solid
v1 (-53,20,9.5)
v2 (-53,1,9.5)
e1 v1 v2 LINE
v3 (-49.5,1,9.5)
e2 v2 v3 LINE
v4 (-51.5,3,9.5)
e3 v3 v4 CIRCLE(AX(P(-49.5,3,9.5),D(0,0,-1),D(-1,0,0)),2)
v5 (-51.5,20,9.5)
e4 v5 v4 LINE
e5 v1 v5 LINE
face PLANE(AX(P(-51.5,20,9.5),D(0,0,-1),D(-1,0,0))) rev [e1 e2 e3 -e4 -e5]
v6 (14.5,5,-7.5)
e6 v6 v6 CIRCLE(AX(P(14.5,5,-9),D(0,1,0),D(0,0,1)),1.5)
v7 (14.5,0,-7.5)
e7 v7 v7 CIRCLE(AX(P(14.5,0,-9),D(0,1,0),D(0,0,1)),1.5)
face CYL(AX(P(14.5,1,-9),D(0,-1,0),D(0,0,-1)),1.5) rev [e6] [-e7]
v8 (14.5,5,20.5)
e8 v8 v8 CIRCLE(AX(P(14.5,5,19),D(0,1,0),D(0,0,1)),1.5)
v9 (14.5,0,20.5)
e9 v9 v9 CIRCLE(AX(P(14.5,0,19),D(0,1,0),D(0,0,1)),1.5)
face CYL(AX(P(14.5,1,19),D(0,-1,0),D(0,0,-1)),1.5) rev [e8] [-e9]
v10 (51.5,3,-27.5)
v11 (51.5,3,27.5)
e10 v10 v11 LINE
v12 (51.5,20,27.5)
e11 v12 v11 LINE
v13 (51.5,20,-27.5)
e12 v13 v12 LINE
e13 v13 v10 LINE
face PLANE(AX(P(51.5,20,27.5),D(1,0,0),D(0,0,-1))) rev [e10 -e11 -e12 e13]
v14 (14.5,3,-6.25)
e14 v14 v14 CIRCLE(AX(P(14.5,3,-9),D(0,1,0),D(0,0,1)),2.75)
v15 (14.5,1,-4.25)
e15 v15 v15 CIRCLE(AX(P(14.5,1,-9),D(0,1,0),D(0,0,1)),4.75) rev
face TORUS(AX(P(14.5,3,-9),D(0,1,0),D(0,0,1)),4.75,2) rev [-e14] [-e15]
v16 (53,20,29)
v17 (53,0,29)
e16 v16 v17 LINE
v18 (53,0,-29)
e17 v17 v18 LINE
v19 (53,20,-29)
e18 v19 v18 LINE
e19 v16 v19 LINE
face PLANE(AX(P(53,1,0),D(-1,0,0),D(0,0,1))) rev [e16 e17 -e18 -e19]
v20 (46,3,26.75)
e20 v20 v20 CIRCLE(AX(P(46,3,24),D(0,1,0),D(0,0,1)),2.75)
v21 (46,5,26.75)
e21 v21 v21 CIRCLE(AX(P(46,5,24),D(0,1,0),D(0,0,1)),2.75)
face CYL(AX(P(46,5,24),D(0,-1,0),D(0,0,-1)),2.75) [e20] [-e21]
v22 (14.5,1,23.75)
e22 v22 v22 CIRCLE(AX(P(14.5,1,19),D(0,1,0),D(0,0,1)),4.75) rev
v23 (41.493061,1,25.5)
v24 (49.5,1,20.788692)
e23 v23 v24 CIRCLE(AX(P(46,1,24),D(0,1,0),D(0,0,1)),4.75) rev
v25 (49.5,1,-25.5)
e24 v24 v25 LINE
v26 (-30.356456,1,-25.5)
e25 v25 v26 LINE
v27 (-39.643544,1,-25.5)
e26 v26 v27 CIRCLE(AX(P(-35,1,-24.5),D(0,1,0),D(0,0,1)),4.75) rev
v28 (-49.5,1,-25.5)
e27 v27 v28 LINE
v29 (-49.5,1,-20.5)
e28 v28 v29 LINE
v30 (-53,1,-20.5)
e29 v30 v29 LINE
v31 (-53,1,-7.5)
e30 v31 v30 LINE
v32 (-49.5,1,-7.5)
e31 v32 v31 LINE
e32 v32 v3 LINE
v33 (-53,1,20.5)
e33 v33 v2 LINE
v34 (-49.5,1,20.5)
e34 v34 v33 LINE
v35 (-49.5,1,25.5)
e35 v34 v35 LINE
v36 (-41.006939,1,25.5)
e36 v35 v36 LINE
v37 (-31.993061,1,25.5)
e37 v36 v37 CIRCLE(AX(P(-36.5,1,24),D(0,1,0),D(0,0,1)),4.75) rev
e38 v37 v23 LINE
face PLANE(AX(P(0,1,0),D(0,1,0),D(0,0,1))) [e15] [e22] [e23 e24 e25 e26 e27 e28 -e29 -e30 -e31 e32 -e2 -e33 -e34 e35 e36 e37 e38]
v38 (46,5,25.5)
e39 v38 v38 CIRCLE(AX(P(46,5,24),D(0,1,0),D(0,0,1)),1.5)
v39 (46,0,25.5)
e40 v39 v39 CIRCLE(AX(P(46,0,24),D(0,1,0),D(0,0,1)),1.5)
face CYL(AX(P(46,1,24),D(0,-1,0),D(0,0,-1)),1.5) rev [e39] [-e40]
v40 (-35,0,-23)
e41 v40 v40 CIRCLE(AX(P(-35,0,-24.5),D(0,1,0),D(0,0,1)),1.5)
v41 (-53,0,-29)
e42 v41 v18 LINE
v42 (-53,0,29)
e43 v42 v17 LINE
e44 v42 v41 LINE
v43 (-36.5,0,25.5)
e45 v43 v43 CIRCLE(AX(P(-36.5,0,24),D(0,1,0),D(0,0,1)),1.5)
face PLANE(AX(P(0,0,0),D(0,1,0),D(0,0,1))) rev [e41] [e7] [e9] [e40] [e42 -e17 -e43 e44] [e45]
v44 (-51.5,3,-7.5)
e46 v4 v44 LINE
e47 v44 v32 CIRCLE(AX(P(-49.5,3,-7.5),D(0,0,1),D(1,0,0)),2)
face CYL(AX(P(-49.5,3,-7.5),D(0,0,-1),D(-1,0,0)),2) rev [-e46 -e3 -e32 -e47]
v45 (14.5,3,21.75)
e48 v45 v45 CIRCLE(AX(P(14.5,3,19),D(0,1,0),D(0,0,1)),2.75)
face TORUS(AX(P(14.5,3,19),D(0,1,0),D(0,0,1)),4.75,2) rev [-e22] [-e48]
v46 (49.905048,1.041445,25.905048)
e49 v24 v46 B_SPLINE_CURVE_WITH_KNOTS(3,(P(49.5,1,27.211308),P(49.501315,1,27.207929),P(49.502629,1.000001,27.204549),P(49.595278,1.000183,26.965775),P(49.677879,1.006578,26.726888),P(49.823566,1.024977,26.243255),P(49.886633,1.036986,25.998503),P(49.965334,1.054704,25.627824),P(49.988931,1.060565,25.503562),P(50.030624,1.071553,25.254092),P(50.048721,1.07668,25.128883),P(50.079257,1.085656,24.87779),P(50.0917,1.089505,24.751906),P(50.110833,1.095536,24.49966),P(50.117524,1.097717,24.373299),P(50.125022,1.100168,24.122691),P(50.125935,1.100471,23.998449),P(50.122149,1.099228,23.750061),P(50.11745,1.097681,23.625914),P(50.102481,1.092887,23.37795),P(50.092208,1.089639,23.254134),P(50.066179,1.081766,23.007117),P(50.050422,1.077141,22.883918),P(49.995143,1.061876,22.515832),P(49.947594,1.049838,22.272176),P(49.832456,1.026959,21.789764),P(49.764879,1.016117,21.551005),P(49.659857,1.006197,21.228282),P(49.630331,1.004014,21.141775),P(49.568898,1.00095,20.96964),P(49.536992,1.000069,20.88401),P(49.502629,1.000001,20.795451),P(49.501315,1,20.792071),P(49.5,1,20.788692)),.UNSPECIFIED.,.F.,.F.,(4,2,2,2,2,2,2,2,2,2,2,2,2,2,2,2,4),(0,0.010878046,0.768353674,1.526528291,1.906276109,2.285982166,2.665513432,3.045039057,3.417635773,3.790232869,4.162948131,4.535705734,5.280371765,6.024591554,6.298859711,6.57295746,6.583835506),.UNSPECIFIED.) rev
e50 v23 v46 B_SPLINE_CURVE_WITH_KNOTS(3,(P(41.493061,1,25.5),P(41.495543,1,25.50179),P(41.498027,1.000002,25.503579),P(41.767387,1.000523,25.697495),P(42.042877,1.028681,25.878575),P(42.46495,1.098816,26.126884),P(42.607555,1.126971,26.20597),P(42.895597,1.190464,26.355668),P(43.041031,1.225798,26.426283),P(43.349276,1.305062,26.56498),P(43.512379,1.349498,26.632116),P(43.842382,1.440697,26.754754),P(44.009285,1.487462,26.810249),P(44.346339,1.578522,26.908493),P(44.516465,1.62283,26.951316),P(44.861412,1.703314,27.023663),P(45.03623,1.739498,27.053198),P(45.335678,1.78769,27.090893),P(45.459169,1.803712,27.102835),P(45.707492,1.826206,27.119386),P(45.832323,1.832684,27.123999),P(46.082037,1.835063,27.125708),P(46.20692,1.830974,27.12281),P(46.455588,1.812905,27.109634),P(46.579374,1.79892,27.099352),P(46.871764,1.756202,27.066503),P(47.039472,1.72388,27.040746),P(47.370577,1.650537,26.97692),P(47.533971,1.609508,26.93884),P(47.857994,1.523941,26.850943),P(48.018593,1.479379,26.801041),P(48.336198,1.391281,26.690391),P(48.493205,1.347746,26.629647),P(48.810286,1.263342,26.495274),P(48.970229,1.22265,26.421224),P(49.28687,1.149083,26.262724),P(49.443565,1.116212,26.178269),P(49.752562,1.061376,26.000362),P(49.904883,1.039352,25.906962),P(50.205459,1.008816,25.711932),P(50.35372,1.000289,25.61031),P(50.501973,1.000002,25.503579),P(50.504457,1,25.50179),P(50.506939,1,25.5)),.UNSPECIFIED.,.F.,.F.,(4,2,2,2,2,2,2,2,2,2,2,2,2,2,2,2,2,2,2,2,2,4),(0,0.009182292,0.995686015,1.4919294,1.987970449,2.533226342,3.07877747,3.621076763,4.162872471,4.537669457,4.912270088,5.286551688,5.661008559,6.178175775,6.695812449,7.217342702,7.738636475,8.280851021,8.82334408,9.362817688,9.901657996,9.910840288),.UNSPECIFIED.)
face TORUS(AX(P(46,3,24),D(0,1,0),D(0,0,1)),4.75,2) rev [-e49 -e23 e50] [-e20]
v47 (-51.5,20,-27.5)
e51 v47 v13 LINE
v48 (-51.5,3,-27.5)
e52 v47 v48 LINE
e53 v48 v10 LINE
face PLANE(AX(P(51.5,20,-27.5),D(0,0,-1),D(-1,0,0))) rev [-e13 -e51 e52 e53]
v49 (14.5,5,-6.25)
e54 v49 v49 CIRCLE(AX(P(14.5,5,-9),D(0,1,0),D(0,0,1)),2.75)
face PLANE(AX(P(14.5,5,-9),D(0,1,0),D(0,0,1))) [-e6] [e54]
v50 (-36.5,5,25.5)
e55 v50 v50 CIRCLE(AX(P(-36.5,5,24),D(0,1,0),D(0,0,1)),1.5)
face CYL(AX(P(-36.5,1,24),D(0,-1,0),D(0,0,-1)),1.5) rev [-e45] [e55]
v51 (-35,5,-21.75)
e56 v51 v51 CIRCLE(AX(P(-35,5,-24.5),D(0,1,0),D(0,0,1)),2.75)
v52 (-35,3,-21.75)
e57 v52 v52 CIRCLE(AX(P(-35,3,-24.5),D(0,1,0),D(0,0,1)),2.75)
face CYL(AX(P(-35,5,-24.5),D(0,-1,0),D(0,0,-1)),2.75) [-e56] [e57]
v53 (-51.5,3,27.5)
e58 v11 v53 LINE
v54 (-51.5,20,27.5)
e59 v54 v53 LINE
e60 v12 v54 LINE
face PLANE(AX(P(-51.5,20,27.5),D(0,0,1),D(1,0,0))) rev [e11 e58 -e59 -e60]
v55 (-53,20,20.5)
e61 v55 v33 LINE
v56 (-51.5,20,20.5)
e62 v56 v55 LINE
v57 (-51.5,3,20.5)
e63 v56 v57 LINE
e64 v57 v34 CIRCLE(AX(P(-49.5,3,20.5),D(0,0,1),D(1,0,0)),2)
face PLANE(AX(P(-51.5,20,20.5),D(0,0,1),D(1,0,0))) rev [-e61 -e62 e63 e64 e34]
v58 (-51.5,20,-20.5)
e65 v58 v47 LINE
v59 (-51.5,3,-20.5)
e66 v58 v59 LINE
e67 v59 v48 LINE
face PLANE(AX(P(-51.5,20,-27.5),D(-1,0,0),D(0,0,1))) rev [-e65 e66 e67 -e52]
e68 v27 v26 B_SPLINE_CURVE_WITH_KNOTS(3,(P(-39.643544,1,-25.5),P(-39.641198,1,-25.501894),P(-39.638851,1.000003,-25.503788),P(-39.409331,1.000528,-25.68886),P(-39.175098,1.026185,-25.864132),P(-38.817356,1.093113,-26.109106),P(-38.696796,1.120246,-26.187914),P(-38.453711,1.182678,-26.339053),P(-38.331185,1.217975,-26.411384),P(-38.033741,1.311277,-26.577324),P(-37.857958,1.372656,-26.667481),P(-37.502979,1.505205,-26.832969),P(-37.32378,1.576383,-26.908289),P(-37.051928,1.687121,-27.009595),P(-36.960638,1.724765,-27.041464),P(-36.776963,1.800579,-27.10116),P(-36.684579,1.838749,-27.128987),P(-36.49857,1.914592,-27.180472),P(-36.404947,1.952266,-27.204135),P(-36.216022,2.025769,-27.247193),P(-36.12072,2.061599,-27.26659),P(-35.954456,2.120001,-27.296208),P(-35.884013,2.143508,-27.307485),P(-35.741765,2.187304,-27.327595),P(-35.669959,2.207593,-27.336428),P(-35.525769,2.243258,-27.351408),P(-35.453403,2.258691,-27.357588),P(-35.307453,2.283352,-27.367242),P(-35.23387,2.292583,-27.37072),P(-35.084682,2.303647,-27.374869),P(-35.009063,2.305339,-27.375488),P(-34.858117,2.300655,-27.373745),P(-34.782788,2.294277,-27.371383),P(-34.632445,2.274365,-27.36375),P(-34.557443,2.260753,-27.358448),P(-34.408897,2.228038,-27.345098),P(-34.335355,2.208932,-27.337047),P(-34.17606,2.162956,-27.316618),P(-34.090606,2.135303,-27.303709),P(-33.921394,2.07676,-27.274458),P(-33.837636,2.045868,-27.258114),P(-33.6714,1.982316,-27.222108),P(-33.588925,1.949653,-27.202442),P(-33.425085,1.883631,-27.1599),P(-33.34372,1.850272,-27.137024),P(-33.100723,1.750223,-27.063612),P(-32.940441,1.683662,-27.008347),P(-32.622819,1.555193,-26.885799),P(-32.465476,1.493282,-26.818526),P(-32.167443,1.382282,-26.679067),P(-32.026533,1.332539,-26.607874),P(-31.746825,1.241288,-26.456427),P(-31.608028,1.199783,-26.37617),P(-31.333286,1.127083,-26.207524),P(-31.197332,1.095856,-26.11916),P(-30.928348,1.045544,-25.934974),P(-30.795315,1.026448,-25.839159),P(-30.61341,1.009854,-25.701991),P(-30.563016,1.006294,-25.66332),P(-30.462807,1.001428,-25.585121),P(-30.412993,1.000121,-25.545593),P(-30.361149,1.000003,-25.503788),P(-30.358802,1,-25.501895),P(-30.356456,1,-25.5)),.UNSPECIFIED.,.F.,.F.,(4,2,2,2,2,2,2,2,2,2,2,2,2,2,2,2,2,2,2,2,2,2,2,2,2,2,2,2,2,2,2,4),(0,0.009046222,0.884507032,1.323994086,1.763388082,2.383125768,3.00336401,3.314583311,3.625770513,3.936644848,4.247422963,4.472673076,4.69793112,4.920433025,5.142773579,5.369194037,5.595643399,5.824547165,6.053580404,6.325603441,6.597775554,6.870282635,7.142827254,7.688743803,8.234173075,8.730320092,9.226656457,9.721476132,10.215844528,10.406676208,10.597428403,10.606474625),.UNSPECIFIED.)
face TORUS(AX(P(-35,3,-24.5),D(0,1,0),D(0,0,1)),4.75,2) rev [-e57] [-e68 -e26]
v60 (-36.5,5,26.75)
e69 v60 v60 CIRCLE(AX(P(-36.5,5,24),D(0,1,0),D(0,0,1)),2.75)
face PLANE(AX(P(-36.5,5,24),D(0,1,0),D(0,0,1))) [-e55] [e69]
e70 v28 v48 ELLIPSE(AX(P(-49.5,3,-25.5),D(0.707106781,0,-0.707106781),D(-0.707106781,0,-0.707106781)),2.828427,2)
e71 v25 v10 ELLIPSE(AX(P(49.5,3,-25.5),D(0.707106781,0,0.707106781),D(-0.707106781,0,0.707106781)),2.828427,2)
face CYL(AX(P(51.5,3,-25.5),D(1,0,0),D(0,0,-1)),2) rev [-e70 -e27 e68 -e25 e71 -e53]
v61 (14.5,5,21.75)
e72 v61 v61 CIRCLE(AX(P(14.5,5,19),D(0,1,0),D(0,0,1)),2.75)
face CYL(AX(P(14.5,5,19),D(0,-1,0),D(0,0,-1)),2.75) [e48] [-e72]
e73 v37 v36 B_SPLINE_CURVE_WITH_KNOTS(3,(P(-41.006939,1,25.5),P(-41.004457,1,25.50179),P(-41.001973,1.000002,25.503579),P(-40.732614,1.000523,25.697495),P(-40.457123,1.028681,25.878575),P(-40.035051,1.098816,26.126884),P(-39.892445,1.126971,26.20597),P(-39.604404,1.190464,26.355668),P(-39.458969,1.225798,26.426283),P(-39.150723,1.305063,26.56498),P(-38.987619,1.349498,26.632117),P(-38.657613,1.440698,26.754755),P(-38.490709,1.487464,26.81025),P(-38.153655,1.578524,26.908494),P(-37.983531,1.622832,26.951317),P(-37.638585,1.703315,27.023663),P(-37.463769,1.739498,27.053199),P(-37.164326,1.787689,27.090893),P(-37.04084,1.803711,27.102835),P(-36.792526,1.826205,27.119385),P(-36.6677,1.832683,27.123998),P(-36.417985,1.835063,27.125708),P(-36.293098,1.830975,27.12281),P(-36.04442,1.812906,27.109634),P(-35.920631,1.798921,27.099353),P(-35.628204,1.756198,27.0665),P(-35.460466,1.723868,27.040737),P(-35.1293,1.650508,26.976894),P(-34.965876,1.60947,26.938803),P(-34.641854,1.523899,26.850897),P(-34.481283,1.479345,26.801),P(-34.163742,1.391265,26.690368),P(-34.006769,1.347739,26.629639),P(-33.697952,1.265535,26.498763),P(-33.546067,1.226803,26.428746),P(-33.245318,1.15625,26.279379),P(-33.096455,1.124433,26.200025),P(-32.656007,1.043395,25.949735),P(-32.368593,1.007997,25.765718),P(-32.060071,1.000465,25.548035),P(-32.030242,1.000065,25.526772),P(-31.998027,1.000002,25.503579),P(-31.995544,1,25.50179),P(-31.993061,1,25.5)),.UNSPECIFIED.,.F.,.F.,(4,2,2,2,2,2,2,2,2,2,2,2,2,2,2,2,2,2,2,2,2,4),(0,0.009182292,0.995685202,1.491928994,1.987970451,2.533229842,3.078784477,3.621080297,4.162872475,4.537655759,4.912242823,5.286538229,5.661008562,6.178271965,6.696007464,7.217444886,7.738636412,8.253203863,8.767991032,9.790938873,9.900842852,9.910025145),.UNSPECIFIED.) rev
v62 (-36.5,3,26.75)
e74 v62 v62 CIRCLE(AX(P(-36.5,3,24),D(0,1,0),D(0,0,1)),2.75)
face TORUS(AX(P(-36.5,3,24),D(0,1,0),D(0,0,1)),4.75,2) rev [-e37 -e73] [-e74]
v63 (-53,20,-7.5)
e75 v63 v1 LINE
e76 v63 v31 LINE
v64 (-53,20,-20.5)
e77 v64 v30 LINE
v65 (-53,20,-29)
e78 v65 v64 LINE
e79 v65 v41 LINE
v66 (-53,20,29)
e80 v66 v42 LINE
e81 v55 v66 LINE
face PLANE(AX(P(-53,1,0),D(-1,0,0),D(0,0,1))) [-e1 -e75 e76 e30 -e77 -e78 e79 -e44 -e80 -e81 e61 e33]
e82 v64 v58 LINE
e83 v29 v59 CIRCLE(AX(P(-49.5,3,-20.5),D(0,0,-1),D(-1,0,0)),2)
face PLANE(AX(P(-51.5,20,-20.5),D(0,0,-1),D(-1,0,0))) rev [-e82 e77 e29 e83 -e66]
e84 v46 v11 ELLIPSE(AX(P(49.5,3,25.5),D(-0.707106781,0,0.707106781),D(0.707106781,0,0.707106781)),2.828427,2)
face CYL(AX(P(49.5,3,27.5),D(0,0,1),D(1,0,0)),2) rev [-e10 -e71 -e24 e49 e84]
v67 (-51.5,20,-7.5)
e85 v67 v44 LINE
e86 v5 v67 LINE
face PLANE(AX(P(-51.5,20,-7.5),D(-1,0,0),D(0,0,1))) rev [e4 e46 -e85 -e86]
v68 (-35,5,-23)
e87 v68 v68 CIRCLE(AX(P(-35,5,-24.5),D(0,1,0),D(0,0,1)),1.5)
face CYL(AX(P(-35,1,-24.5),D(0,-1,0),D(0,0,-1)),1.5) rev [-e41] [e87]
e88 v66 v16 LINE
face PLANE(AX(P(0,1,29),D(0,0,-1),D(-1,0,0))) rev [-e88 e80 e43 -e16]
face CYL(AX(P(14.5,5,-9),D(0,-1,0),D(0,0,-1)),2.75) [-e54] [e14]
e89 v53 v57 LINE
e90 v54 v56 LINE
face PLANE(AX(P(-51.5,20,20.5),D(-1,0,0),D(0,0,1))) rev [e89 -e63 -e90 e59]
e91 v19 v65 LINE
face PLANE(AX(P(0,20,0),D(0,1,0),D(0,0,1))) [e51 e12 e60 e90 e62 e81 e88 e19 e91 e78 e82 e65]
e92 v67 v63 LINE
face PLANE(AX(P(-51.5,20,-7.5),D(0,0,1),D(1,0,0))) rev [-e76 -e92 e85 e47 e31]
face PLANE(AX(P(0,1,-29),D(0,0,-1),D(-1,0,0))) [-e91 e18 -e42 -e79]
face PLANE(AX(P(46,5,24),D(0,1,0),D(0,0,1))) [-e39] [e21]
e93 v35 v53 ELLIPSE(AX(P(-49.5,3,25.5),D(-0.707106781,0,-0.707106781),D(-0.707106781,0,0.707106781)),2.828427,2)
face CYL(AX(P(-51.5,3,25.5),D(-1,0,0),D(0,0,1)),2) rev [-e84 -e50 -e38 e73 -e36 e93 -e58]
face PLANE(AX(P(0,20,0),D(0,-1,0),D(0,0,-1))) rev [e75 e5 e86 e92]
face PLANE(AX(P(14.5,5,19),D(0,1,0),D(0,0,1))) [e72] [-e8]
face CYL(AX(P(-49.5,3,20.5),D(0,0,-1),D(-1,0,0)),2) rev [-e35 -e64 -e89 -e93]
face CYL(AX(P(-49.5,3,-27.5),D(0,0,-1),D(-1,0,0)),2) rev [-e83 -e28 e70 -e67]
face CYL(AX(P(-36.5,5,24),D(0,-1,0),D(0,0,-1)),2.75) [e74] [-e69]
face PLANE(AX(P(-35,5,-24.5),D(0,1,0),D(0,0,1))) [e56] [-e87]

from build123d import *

# Parameters (mm, degrees)
SKETCH1_W           = 106
SKETCH1_H           = 58
SKETCH1_W_2         = 103
SKETCH1_H_2         = 55
SKETCH1_R           = 1.5
BOSS_EXTRUDE1_DEPTH = 1
SKETCH4_R           = 2.75
SKETCH4_R_2         = 1.5
BOSS_EXTRUDE4_DEPTH = 4
SKETCH5_W           = 1.5
SKETCH5_H           = 17
BOSS_EXTRUDE5_DEPTH = 19
FILLET1_R           = 2


with BuildPart() as part:
    # Sketch1 → Boss-Extrude1 (new body)
    # profile 1 of 2: a face of its own
    with BuildSketch(Plane(origin=(0, 0, 0), x_dir=(1, 0, 0), z_dir=(0, 1, 0))):
        Rectangle(SKETCH1_W, SKETCH1_H)
        Rectangle(SKETCH1_W_2, SKETCH1_H_2, mode=Mode.SUBTRACT)
    # profile 2 of 2: a face of its own
    with BuildSketch(Plane(origin=(0, 0, 0), x_dir=(1, 0, 0), z_dir=(0, 1, 0))):
        Rectangle(SKETCH1_W_2, SKETCH1_H_2)
        with Locations(Location((46, -24, 0), (0, 0, 270))):
            Circle(SKETCH1_R, mode=Mode.SUBTRACT)
        with Locations(Location((14.5, 9, 0), (0, 0, 270))):
            Circle(SKETCH1_R, mode=Mode.SUBTRACT)
        with Locations(Location((14.5, -19, 0), (0, 0, 270))):
            Circle(SKETCH1_R, mode=Mode.SUBTRACT)
        with Locations(Location((-36.5, -24, 0), (0, 0, 270))):
            Circle(SKETCH1_R, mode=Mode.SUBTRACT)
        with Locations(Location((-35, 24.5, 0), (0, 0, 270))):
            Circle(SKETCH1_R, mode=Mode.SUBTRACT)
    extrude(amount=BOSS_EXTRUDE1_DEPTH)

    # Sketch4 → Boss-Extrude4 (add)
    # profile 1 of 5: a face of its own
    with BuildSketch(Plane(origin=(0, 1, 0), x_dir=(1, 0, 0), z_dir=(0, 1, 0))):
        with Locations(Location((-35, 24.5, 0), (0, 0, 270))):
            Circle(SKETCH4_R)
        with Locations(Location((-35, 24.5, 0), (0, 0, 270))):
            Circle(SKETCH4_R_2, mode=Mode.SUBTRACT)
    # profile 2 of 5: a face of its own
    with BuildSketch(Plane(origin=(0, 1, 0), x_dir=(1, 0, 0), z_dir=(0, 1, 0))):
        with Locations(Location((14.5, 9, 0), (0, 0, 270))):
            Circle(SKETCH4_R)
        with Locations(Location((14.5, 9, 0), (0, 0, 270))):
            Circle(SKETCH4_R_2, mode=Mode.SUBTRACT)
    # profile 3 of 5: a face of its own
    with BuildSketch(Plane(origin=(0, 1, 0), x_dir=(1, 0, 0), z_dir=(0, 1, 0))):
        with Locations(Location((46, -24, 0), (0, 0, 270))):
            Circle(SKETCH4_R)
        with Locations(Location((46, -24, 0), (0, 0, 270))):
            Circle(SKETCH4_R_2, mode=Mode.SUBTRACT)
    # profile 4 of 5: a face of its own
    with BuildSketch(Plane(origin=(0, 1, 0), x_dir=(1, 0, 0), z_dir=(0, 1, 0))):
        with Locations(Location((14.5, -19, 0), (0, 0, 270))):
            Circle(SKETCH4_R)
        with Locations(Location((14.5, -19, 0), (0, 0, 270))):
            Circle(SKETCH4_R_2, mode=Mode.SUBTRACT)
    # profile 5 of 5: a face of its own
    with BuildSketch(Plane(origin=(0, 1, 0), x_dir=(1, 0, 0), z_dir=(0, 1, 0))):
        with Locations(Location((-36.5, -24, 0), (0, 0, 270))):
            Circle(SKETCH4_R)
        with Locations(Location((-36.5, -24, 0), (0, 0, 270))):
            Circle(SKETCH4_R_2, mode=Mode.SUBTRACT)
    extrude(amount=BOSS_EXTRUDE4_DEPTH)

    # Sketch5 → Boss-Extrude5 (add)
    with BuildSketch(Plane(origin=(0, 1, 0), x_dir=(1, 0, 0), z_dir=(0, 1, 0))):
        Polygon((-51.5, -20.5), (-51.5, -27.5), (51.5, -27.5), (51.5, 27.5), (-51.5, 27.5), (-51.5, 20.5), (-53, 20.5), (-53, 29), (53, 29), (53, -29), (-53, -29), (-53, -20.5), align=None)
        with Locations((-52.25, -1)):
            Rectangle(SKETCH5_W, SKETCH5_H)
    extrude(amount=BOSS_EXTRUDE5_DEPTH)

    # Fillet1
    # the kernel refuses this fillet: 2 mm, written as the material it adds along each edge
    with BuildSketch(Plane(origin=(-35, 1, -24.5), x_dir=(0, 0, 1), z_dir=(-1, 0, 0))) as fillet1_piece_1_section:
        with BuildLine():
            CenterArc((2.75 + FILLET1_R, FILLET1_R), FILLET1_R, 180, 90)
            Line((2.75, FILLET1_R), (2.75, 0))
            Line((2.75, 0), (2.75 + FILLET1_R, 0))
        make_face()
    fillet1_piece_1 = revolve(axis=Axis((-35, 1, -24.5), (0, 1, 0)), mode=Mode.PRIVATE)
    fillet1_piece_1 = split(fillet1_piece_1, bisect_by=Plane(origin=(-31.340267313, 1.044014646, -29), z_dir=(0, 0, 1)), keep=Keep.TOP, mode=Mode.PRIVATE)
    add(fillet1_piece_1)
    with BuildSketch(Plane(origin=(14.5, 1, -9), x_dir=(0, 0, 1), z_dir=(-1, 0, 0))) as fillet1_piece_2:
        with BuildLine():
            CenterArc((2.75 + FILLET1_R, FILLET1_R), FILLET1_R, 180, 90)
            Line((2.75, FILLET1_R), (2.75, 0))
            Line((2.75, 0), (2.75 + FILLET1_R, 0))
        make_face()
    revolve(axis=Axis((14.5, 1, -9), (0, 1, 0)))
    with BuildSketch(Plane(origin=(46, 1, 24), x_dir=(0, 0, 1), z_dir=(-1, 0, 0))) as fillet1_piece_3:
        with BuildLine():
            CenterArc((2.75 + FILLET1_R, FILLET1_R), FILLET1_R, 180, 90)
            Line((2.75 + FILLET1_R, 0), (2.75, 0))
            Line((2.75, 0), (2.75, FILLET1_R))
        make_face()
    revolve(axis=Axis((46, 1, 24), (0, 1, 0)))
    with BuildSketch(Plane(origin=(14.5, 1, 19), x_dir=(0, 0, 1), z_dir=(-1, 0, 0))) as fillet1_piece_4:
        with BuildLine():
            CenterArc((2.75 + FILLET1_R, FILLET1_R), FILLET1_R, 180, 90)
            Line((2.75, FILLET1_R), (2.75, 0))
            Line((2.75, 0), (2.75 + FILLET1_R, 0))
        make_face()
    revolve(axis=Axis((14.5, 1, 19), (0, 1, 0)))
    with BuildSketch(Plane(origin=(-36.5, 1, 24), x_dir=(0, 0, 1), z_dir=(-1, 0, 0))) as fillet1_piece_5:
        with BuildLine():
            CenterArc((2.75 + FILLET1_R, FILLET1_R), FILLET1_R, 180, 90)
            Line((2.75, FILLET1_R), (2.75, 0))
            Line((2.75, 0), (2.75 + FILLET1_R, 0))
        make_face()
    revolve(axis=Axis((-36.5, 1, 24), (0, 1, 0)))
    with BuildSketch(Plane(origin=(-51.5, 1, -32.5), x_dir=(1, 0, 0), z_dir=(0, 0, 1))) as fillet1_piece_6_section:
        with BuildLine():
            CenterArc((FILLET1_R, FILLET1_R), FILLET1_R, 180, 90)
            Line((0, FILLET1_R), (0, 0))
            Line((0, 0), (FILLET1_R, 0))
        make_face()
    fillet1_piece_6 = extrude(amount=12, mode=Mode.PRIVATE)
    fillet1_piece_6 = split(fillet1_piece_6, bisect_by=Plane(origin=(-51.053264122, 1.446735878, -29), z_dir=(0, 0, 1)), keep=Keep.TOP, mode=Mode.PRIVATE)
    add(fillet1_piece_6)
    with BuildSketch(Plane(origin=(56.5, 1, -27.5), x_dir=(0, 0, 1), z_dir=(-1, 0, 0))) as fillet1_piece_7_section:
        with BuildLine():
            CenterArc((FILLET1_R, FILLET1_R), FILLET1_R, 180, 90)
            Line((0, FILLET1_R), (0, 0))
            Line((0, 0), (FILLET1_R, 0))
        make_face()
    fillet1_piece_7 = extrude(amount=113, mode=Mode.PRIVATE)
    fillet1_piece_7 = fillet1_piece_7 - Plane(origin=(-35, 1.450094652, -24.5), x_dir=(0, 0, 1), z_dir=(0, -1, 0)) * Cylinder(1.5, 234, mode=Mode.PRIVATE)
    fillet1_piece_7 = split(fillet1_piece_7, bisect_by=Plane(origin=(53, 1.450094652, -27.058704207), z_dir=(-1, 0, 0)), keep=Keep.TOP, mode=Mode.PRIVATE)
    fillet1_piece_7 = split(fillet1_piece_7, bisect_by=Plane(origin=(-53, 1.450094652, -27.058704207), z_dir=(1, 0, 0)), keep=Keep.TOP, mode=Mode.PRIVATE)
    add(fillet1_piece_7)
    with BuildSketch(Plane(origin=(51.5, 1, 27.5), x_dir=(-1, 0, 0), z_dir=(0, 0, -1))) as fillet1_piece_8_section:
        with BuildLine():
            CenterArc((FILLET1_R, FILLET1_R), FILLET1_R, 180, 90)
            Line((0, FILLET1_R), (0, 0))
            Line((0, 0), (FILLET1_R, 0))
        make_face()
    fillet1_piece_8 = extrude(amount=60, mode=Mode.PRIVATE)
    fillet1_piece_8 = split(fillet1_piece_8, bisect_by=Plane(origin=(51.053264122, 1.446735878, -29), z_dir=(0, 0, 1)), keep=Keep.TOP, mode=Mode.PRIVATE)
    add(fillet1_piece_8)
    with BuildSketch(Plane(origin=(-56.5, 1, 27.5), x_dir=(0, 0, -1), z_dir=(1, 0, 0))) as fillet1_piece_9_section:
        with BuildLine():
            CenterArc((FILLET1_R, FILLET1_R), FILLET1_R, 180, 90)
            Line((0, FILLET1_R), (0, 0))
            Line((0, 0), (FILLET1_R, 0))
        make_face()
    fillet1_piece_9 = extrude(amount=113, mode=Mode.PRIVATE)
    fillet1_piece_9 = split(fillet1_piece_9, bisect_by=Plane(origin=(53, 1.449828353, 27.059644871), z_dir=(-1, 0, 0)), keep=Keep.TOP, mode=Mode.PRIVATE)
    fillet1_piece_9 = split(fillet1_piece_9, bisect_by=Plane(origin=(-53, 1.449828353, 27.059644871), z_dir=(1, 0, 0)), keep=Keep.TOP, mode=Mode.PRIVATE)
    add(fillet1_piece_9)
    with BuildSketch(Plane(origin=(-51.5, 1, 20.5), x_dir=(1, 0, 0), z_dir=(0, 0, 1))) as fillet1_piece_10:
        with BuildLine():
            CenterArc((FILLET1_R, FILLET1_R), FILLET1_R, 180, 90)
            Line((0, FILLET1_R), (0, 0))
            Line((0, 0), (FILLET1_R, 0))
        make_face()
    extrude(amount=7)
    with BuildSketch(Plane(origin=(-51.5, 1, -7.5), x_dir=(1, 0, 0), z_dir=(0, 0, 1))) as fillet1_piece_11:
        with BuildLine():
            CenterArc((FILLET1_R, FILLET1_R), FILLET1_R, 180, 90)
            Line((0, FILLET1_R), (0, 0))
            Line((0, 0), (FILLET1_R, 0))
        make_face()
    extrude(amount=17)


solid = part.part
